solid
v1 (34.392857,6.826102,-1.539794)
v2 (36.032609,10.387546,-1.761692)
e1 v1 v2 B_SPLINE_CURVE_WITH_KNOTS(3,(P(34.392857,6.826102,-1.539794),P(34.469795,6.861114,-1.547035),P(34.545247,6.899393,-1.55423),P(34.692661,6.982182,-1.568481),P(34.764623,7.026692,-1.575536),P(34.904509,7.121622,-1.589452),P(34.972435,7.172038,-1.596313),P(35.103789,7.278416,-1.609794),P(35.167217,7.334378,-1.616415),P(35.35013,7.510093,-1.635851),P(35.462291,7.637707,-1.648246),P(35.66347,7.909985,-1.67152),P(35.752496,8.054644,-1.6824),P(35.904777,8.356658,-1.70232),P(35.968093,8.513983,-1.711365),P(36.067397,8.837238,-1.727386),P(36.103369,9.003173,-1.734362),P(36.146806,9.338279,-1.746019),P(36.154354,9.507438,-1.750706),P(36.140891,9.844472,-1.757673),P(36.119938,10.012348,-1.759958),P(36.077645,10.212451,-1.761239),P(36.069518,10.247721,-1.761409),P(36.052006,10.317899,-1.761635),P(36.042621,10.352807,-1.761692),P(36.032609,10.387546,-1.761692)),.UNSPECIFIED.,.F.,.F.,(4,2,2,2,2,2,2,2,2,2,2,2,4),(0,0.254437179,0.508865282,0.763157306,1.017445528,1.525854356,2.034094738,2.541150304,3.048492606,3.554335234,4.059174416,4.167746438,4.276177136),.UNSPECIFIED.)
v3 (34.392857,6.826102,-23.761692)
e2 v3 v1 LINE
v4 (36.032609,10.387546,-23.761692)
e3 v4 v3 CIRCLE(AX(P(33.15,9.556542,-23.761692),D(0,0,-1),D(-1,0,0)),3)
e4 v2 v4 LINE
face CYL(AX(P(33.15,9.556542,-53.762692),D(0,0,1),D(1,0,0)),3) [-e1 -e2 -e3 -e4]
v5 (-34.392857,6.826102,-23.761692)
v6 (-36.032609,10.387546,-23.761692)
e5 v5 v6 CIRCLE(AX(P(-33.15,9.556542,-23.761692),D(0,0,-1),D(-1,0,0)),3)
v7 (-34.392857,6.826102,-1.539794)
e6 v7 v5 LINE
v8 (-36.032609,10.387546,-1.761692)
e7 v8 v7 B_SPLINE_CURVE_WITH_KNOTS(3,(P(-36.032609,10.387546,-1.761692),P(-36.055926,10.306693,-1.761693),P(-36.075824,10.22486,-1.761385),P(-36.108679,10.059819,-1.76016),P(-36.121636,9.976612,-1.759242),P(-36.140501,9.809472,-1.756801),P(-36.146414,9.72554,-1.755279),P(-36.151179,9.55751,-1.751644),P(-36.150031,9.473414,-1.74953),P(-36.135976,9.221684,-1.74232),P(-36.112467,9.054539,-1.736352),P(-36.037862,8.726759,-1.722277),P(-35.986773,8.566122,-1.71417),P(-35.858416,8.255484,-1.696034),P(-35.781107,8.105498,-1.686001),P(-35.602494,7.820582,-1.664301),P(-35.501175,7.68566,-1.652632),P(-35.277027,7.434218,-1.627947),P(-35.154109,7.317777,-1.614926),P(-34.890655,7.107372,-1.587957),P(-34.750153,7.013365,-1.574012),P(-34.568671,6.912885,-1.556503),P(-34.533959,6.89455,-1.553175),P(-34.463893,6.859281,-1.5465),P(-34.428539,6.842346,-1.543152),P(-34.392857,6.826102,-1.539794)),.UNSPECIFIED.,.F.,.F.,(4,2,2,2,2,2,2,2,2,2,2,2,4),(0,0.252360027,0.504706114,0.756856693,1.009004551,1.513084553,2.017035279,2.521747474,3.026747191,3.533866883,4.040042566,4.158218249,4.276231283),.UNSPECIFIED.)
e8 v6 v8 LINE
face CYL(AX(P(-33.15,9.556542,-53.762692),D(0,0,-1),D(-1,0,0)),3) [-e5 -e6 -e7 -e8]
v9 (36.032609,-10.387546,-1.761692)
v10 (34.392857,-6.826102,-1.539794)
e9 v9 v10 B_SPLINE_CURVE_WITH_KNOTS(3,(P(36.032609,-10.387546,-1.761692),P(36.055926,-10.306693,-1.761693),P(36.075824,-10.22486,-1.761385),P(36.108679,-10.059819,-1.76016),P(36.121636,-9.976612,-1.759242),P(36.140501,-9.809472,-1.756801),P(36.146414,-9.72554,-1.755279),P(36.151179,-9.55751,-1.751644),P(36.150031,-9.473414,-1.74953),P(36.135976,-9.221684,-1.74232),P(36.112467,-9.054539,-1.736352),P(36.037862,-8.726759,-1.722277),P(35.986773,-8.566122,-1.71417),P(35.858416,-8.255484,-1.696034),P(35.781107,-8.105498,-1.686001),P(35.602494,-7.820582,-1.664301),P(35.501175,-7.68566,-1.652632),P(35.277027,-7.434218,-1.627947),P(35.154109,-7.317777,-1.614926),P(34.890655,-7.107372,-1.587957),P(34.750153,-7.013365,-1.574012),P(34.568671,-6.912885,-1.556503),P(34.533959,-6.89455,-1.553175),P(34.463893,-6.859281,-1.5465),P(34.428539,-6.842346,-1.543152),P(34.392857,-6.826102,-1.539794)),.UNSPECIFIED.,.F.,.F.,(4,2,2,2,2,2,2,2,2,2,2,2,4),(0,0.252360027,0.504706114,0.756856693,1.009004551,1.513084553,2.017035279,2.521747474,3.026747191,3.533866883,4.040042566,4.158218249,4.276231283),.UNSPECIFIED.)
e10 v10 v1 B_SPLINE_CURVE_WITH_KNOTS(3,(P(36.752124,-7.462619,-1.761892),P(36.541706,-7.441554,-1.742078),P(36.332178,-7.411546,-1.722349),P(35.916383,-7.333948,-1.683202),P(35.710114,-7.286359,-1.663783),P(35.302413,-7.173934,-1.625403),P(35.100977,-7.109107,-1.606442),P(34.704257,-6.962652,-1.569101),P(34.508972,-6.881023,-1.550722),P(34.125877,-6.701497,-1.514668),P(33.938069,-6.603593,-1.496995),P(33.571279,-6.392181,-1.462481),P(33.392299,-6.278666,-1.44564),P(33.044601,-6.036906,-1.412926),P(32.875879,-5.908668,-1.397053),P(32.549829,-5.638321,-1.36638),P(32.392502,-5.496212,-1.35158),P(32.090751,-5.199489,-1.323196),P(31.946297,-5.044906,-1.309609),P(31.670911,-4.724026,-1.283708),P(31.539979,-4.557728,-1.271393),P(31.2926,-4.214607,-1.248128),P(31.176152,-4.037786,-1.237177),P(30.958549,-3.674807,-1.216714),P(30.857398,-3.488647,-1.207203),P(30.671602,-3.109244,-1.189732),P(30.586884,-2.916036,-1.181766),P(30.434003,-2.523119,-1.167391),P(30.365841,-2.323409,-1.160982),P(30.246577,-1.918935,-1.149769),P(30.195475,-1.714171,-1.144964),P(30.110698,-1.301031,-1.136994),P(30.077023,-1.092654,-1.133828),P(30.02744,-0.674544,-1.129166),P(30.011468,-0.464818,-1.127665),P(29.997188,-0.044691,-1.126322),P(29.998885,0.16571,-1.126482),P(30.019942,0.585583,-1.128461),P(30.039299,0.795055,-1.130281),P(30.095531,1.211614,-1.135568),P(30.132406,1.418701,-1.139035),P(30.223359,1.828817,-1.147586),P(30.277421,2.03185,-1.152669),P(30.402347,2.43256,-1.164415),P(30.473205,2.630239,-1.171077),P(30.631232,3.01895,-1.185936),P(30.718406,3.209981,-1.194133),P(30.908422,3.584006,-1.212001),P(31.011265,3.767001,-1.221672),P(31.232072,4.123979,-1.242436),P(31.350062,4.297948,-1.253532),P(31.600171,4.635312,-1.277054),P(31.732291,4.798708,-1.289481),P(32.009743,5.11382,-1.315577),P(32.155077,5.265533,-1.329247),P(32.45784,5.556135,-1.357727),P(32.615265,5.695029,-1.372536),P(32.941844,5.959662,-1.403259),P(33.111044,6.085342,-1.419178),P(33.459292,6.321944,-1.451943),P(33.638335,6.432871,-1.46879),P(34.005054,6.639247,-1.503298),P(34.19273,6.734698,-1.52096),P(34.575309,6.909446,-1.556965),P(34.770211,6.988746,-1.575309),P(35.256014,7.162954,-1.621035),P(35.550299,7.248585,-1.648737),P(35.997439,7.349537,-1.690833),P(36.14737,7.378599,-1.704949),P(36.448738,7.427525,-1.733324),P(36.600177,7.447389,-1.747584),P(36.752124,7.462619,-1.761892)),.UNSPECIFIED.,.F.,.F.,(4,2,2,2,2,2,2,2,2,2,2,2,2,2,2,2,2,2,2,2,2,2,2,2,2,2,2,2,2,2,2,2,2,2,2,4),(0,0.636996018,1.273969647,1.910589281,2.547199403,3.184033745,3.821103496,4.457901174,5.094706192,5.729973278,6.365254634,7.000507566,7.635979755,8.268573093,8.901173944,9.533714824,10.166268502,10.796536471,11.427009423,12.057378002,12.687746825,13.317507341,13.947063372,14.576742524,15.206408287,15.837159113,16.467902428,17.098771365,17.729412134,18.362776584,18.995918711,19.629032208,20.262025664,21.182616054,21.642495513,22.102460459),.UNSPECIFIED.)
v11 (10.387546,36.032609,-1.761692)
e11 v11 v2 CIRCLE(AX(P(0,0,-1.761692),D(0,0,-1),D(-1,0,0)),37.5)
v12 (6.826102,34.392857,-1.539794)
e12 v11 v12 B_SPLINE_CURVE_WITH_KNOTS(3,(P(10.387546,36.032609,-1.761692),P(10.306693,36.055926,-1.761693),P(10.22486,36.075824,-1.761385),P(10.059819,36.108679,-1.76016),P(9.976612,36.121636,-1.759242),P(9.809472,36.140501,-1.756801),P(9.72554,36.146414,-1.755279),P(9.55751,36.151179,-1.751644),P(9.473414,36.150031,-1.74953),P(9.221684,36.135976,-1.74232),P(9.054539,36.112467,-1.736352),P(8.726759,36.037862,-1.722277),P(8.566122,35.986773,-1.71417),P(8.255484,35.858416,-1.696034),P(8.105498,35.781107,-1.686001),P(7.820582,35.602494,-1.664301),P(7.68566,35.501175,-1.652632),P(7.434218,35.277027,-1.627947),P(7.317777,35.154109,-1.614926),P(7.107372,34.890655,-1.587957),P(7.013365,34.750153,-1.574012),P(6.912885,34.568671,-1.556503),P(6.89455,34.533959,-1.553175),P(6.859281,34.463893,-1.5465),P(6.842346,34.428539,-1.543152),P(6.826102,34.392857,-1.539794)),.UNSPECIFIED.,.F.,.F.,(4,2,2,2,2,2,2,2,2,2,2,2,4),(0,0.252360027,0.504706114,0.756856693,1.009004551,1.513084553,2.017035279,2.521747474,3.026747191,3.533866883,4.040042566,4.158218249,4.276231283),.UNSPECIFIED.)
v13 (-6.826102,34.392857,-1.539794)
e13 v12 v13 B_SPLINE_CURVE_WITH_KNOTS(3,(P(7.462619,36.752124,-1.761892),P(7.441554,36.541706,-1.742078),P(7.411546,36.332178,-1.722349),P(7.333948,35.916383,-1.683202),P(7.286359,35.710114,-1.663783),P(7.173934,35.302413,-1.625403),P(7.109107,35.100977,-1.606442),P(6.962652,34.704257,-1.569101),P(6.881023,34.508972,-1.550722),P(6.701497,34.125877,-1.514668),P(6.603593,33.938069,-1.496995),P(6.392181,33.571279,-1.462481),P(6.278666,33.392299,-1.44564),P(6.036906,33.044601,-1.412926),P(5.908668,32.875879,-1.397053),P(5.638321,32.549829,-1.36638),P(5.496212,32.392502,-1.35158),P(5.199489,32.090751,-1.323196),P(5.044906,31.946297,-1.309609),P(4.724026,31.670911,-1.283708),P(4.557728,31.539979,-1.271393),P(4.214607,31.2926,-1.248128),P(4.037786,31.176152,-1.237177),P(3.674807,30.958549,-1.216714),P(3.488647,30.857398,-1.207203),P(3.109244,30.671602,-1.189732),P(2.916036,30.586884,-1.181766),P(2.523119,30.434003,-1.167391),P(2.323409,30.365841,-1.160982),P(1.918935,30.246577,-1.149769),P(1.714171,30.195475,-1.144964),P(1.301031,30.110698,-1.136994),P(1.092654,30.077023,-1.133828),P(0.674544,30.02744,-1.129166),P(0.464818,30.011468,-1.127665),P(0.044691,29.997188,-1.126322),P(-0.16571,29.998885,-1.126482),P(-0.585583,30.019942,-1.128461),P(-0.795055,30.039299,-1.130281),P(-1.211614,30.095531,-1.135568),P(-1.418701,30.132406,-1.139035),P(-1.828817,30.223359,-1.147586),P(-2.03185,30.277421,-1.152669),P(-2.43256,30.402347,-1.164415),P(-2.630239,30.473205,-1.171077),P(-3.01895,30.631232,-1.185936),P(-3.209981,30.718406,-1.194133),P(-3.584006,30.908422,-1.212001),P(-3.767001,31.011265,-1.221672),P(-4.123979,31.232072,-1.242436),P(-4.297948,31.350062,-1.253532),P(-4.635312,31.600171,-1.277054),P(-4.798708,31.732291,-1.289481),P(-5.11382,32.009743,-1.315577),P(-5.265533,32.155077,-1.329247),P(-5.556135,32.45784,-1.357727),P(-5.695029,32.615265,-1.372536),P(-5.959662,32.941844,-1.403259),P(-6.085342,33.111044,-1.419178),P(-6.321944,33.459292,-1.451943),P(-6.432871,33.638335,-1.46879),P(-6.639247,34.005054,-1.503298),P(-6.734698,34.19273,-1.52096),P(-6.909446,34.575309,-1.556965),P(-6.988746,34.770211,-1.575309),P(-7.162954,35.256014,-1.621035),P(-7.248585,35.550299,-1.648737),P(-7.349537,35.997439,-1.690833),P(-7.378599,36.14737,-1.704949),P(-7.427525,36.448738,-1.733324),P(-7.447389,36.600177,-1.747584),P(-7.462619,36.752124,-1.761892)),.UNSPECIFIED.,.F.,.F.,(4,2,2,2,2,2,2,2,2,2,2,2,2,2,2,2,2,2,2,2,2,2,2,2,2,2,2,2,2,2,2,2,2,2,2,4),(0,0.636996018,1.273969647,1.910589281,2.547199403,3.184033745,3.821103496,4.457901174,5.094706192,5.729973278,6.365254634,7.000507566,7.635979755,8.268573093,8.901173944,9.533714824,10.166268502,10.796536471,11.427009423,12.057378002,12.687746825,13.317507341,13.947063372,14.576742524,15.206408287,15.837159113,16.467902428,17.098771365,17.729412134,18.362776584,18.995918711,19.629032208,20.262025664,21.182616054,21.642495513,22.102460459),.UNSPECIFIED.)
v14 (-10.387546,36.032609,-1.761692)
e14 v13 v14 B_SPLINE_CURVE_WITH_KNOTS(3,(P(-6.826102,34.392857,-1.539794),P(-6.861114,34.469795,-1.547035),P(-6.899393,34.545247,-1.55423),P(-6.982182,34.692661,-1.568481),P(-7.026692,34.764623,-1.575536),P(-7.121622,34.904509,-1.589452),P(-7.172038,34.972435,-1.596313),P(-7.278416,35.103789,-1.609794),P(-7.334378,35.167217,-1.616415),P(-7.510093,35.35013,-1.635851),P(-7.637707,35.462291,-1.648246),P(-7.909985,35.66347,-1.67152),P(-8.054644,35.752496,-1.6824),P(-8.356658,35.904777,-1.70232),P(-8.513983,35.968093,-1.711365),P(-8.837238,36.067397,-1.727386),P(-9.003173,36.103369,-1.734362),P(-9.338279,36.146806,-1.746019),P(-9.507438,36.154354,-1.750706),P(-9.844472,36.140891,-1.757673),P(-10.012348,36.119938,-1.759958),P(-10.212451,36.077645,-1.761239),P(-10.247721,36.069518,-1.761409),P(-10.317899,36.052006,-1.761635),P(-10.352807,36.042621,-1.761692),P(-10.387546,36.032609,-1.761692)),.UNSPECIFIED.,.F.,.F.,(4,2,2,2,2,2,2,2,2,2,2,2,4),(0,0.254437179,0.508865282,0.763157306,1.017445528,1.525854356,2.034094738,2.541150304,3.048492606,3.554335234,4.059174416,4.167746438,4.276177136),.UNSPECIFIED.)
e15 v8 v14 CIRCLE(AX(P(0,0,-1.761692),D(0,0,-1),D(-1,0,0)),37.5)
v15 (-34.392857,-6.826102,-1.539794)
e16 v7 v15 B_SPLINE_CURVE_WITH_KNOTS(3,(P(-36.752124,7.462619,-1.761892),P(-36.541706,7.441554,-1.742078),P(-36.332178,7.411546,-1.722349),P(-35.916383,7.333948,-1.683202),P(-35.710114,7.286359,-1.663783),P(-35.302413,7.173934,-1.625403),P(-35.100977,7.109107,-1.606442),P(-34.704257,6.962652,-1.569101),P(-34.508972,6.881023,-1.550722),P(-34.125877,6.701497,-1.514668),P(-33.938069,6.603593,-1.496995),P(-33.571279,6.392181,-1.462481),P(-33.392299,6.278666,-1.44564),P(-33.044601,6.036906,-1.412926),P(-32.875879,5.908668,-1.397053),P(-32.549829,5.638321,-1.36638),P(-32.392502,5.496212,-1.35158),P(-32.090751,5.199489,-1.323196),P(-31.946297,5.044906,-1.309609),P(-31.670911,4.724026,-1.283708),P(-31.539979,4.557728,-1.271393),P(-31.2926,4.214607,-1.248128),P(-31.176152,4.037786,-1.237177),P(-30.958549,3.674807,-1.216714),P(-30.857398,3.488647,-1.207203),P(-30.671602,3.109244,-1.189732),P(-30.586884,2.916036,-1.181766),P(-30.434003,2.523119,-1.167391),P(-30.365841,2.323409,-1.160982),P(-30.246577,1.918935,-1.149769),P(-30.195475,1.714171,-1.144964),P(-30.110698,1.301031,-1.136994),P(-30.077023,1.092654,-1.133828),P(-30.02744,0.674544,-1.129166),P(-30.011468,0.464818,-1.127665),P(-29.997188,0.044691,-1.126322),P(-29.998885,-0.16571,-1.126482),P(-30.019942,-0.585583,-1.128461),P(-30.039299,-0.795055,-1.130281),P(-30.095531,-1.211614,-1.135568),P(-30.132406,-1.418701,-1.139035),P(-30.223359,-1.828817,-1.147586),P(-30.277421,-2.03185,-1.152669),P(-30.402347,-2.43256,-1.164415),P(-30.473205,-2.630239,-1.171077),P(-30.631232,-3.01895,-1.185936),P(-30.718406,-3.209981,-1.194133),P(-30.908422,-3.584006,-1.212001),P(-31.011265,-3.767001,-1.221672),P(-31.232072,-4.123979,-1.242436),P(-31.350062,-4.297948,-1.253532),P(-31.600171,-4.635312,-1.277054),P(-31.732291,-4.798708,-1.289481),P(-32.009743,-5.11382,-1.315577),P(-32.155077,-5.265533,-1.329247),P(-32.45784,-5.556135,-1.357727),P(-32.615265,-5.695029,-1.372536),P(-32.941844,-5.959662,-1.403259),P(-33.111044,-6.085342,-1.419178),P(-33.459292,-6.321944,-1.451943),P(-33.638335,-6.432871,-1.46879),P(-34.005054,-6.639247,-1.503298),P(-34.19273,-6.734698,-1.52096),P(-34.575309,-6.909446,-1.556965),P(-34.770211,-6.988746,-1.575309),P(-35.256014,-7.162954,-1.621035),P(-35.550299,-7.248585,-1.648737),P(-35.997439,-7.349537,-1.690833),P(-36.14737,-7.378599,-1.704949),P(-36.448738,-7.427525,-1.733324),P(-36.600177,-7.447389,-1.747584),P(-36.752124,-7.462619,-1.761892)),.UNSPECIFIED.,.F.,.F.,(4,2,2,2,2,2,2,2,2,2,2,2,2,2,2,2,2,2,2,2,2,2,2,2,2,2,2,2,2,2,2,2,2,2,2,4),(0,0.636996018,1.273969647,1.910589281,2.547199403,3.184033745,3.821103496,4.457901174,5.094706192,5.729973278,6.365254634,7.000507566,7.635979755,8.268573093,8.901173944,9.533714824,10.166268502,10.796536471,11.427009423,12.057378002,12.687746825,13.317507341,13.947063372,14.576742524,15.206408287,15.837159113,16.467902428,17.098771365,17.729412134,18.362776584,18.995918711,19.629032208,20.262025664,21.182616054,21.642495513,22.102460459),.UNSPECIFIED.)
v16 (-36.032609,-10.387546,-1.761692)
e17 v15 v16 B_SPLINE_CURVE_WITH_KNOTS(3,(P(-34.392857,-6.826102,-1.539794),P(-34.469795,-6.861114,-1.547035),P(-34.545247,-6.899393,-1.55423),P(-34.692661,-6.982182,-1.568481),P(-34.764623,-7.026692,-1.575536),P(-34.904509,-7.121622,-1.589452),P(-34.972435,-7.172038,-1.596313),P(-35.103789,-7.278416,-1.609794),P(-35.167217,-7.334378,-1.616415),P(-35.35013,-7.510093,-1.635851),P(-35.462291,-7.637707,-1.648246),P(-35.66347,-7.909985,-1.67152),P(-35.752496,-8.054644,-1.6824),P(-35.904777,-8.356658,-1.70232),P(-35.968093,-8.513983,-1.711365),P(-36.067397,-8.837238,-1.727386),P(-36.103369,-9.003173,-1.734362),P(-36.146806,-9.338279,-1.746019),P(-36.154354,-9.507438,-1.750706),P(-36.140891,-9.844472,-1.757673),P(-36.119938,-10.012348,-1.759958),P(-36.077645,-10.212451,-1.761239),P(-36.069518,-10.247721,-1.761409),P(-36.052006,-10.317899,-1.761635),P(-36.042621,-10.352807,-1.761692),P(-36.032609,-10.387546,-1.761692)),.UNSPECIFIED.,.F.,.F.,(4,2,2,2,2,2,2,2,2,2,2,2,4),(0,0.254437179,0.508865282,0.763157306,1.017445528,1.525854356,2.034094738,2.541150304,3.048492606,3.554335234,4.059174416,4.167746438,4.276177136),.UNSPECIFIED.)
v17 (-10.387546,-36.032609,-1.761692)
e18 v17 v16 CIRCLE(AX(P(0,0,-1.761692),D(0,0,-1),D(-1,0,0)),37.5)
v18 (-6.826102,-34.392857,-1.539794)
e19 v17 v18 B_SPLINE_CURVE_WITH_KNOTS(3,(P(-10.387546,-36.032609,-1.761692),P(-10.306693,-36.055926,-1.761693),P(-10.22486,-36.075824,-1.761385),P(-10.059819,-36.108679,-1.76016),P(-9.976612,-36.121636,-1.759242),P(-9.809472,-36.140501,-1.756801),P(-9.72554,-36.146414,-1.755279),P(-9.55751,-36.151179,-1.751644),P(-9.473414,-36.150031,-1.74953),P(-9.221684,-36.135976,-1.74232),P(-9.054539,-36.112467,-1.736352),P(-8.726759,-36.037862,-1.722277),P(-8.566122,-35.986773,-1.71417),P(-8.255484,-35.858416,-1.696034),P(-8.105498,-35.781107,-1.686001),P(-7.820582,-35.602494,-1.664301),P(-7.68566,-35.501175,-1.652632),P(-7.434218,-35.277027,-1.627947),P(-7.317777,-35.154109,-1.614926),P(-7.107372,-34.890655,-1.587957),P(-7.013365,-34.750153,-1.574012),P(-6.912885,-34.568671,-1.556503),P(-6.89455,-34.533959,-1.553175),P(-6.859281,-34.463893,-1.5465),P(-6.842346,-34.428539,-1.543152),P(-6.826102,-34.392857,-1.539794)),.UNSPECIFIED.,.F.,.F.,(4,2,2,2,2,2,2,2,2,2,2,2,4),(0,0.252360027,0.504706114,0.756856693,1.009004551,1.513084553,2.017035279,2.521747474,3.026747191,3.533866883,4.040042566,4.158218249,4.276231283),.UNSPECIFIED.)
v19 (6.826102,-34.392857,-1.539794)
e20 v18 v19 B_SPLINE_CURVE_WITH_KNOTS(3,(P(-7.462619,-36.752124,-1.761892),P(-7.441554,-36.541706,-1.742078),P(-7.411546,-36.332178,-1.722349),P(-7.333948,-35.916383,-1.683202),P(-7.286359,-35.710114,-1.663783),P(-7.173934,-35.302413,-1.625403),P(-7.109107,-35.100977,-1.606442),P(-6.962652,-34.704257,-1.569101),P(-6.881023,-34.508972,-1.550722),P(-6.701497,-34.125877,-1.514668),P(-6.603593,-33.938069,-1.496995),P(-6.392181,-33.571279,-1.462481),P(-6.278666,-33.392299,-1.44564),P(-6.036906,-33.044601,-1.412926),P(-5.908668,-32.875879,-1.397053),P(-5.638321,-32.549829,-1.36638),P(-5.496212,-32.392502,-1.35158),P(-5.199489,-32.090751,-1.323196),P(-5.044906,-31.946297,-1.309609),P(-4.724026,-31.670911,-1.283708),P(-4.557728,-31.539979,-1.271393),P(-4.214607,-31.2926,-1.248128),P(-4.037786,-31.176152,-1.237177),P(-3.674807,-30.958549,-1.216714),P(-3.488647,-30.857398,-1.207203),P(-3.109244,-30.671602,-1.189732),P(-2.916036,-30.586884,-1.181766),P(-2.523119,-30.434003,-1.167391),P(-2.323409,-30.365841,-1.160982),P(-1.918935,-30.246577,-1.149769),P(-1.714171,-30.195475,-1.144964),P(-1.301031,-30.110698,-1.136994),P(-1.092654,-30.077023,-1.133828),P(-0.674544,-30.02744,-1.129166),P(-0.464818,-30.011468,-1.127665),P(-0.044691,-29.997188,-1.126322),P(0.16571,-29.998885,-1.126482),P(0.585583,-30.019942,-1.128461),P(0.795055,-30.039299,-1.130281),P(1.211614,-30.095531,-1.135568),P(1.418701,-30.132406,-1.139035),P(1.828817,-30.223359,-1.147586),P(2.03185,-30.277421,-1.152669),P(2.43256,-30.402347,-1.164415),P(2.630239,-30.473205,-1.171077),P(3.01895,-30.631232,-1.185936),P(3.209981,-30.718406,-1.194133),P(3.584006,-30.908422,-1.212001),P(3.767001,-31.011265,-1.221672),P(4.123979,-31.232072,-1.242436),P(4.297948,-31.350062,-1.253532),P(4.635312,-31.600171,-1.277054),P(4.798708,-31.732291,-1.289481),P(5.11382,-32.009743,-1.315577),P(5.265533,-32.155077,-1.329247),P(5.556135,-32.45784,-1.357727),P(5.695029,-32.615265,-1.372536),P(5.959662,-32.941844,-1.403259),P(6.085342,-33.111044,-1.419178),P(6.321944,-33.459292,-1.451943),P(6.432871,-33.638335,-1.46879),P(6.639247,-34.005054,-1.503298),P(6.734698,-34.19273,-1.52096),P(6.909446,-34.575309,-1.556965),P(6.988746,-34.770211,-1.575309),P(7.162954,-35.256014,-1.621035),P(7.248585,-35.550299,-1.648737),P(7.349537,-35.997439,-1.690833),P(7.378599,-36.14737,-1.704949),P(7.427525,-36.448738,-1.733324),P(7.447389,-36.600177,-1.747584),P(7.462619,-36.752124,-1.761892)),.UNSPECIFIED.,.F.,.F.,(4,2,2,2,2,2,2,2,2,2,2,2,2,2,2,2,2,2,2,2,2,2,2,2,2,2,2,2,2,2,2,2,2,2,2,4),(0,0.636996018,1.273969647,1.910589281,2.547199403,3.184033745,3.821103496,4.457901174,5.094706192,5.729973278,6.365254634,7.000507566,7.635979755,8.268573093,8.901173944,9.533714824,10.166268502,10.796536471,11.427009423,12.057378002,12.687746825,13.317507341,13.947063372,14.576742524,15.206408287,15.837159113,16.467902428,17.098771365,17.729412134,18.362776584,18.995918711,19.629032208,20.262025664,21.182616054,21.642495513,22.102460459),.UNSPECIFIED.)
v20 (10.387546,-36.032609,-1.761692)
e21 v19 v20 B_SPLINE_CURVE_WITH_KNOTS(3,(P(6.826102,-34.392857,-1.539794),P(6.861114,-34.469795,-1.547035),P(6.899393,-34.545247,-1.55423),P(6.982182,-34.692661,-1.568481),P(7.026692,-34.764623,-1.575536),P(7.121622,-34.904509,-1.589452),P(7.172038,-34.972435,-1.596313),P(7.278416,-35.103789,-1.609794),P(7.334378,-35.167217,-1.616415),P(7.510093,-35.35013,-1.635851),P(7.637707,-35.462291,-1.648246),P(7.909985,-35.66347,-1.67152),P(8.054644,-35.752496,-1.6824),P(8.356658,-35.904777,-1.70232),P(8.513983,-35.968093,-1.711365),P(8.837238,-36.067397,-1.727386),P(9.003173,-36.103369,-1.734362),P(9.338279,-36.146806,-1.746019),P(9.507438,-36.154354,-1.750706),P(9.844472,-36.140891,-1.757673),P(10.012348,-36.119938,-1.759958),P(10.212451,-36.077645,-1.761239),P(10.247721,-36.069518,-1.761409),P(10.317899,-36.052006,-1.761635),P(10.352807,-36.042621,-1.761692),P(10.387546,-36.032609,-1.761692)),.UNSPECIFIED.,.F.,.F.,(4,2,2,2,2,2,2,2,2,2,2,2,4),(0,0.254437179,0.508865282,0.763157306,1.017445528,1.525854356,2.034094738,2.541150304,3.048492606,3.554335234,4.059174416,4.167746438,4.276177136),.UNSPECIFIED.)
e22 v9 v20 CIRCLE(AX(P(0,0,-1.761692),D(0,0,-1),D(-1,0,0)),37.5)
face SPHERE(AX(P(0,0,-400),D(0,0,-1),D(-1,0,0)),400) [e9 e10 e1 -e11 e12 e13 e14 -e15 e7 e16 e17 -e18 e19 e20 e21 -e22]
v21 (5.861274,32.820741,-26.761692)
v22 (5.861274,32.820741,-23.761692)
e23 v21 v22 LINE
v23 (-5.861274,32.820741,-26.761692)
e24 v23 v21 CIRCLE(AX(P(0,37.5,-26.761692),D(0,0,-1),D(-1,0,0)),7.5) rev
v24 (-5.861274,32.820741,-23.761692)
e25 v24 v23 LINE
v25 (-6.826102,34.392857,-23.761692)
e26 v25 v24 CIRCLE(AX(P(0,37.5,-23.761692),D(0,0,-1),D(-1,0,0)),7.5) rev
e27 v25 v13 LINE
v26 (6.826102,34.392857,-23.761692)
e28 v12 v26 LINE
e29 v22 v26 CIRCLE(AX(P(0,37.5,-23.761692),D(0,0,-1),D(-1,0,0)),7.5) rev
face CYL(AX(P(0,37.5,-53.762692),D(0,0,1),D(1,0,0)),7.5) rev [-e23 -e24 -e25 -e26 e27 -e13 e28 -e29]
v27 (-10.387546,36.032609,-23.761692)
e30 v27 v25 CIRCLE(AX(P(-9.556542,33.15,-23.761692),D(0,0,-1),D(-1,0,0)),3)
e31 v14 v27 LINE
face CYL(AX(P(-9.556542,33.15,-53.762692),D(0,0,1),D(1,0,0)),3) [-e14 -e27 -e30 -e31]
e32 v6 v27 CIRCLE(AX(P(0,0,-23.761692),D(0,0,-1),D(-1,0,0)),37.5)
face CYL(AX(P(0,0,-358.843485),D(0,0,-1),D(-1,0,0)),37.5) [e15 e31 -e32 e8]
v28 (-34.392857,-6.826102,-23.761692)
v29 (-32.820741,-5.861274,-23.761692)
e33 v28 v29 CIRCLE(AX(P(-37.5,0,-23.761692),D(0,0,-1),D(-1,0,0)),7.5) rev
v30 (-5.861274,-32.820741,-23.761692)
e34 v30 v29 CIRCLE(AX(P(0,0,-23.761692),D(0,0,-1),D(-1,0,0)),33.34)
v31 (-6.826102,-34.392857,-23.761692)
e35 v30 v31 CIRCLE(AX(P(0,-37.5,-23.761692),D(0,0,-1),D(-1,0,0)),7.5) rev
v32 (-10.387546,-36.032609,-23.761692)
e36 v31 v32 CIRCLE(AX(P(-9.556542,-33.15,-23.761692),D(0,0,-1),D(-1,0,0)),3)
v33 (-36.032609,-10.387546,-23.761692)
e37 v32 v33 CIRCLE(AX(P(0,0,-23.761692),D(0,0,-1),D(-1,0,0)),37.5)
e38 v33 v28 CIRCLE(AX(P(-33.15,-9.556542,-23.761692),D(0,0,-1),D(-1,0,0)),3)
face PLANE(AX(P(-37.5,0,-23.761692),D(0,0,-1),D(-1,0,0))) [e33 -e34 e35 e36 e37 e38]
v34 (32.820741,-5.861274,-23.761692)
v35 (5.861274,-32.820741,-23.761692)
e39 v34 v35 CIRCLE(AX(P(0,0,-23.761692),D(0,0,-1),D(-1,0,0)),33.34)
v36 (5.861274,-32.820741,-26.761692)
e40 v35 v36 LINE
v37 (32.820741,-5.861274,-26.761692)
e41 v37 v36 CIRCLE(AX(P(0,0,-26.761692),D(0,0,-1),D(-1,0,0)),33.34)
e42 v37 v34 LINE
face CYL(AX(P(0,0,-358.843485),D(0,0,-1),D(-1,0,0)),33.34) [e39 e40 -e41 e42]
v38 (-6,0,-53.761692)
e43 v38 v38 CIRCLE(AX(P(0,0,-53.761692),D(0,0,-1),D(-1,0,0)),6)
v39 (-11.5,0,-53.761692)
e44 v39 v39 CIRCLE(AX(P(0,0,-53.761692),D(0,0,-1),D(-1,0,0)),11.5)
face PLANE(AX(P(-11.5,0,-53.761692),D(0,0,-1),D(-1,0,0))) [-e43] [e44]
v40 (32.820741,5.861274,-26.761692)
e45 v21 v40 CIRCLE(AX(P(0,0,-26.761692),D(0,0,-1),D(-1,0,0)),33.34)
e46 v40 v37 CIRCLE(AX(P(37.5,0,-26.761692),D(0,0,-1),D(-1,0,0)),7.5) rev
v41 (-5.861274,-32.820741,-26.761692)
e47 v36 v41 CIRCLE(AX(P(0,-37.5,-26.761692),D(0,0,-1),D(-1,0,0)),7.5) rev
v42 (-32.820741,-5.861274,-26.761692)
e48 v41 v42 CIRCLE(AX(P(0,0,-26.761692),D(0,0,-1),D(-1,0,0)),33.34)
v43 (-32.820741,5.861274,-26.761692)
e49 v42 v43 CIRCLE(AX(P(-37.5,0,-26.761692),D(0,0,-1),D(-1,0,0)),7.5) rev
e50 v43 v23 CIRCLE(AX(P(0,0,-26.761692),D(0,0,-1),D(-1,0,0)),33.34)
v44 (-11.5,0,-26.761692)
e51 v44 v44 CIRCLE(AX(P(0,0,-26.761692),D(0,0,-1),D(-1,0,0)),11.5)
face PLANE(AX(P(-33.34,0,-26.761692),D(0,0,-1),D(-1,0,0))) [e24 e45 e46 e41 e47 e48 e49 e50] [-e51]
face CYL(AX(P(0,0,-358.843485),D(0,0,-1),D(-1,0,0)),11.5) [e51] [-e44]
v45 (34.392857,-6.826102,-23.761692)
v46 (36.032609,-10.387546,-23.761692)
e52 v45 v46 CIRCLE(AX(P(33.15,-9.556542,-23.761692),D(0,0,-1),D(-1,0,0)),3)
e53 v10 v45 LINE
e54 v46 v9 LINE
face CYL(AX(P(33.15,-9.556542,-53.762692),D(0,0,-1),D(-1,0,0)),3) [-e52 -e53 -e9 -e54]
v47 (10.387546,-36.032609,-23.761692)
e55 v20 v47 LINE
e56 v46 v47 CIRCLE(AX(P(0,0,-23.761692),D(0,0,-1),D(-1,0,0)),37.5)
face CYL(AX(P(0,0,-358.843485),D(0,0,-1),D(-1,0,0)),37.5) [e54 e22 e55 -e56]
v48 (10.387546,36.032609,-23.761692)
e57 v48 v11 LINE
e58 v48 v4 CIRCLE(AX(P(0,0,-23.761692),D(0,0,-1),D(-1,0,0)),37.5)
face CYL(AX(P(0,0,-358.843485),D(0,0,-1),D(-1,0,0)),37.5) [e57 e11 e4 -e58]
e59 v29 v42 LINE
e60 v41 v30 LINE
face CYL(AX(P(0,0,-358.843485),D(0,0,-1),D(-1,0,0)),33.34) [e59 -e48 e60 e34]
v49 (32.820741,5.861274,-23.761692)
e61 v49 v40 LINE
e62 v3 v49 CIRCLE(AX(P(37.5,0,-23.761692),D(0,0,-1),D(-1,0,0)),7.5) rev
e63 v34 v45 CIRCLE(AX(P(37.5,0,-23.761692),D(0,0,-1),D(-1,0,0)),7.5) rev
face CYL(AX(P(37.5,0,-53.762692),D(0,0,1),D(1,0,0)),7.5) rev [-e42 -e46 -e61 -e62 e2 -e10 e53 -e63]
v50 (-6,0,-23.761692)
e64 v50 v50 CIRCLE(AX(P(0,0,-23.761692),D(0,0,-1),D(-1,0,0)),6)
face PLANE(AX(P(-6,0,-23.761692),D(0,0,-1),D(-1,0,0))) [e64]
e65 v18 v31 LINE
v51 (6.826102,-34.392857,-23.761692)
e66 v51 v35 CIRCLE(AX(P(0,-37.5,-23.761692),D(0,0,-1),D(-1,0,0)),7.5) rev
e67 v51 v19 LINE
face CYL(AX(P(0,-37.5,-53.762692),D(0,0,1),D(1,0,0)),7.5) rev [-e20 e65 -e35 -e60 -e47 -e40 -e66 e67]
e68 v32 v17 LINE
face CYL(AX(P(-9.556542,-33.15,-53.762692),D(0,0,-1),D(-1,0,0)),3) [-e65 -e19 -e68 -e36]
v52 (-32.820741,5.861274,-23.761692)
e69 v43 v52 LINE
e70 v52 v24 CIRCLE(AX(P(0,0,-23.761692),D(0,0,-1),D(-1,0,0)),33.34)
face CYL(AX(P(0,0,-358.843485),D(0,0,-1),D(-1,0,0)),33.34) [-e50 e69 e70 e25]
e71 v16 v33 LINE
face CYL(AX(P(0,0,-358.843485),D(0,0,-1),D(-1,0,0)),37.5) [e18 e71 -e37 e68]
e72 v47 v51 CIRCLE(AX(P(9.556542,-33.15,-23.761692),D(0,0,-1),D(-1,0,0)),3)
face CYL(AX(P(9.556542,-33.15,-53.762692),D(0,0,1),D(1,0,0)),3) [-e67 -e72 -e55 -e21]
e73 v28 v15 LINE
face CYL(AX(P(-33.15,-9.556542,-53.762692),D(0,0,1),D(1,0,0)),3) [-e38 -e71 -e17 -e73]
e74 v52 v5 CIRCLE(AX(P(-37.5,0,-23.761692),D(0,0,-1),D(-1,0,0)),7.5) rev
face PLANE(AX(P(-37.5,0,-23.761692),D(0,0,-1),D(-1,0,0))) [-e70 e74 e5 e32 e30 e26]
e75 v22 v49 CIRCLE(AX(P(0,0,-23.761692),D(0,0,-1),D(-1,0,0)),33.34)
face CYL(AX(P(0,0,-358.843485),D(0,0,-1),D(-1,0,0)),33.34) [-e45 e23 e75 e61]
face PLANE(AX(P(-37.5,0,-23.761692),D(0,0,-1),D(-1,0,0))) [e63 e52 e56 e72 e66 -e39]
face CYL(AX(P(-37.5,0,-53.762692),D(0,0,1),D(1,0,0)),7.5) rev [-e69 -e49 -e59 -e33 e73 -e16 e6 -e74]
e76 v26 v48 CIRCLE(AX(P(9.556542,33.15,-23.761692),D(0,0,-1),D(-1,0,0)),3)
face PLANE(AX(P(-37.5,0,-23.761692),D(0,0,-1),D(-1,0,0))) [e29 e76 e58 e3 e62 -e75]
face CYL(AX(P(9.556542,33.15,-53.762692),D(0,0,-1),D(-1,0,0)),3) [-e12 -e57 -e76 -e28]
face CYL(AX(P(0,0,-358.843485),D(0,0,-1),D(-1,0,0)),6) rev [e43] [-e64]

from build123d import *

# Parameters (mm, degrees)
CUT_EXTRUDE1_REACH = 77.517
SKETCH2_R          = 7.5
FILLET1_R          = 3


with BuildPart() as part:
    # Sketch1 → Revolve1 (revolve)
    with BuildSketch(Plane(origin=(0, 0, 0), x_dir=(1, 0, 0), z_dir=(0, 1, 0))):
        with BuildLine():
            Line((0, 23.761691948), (0, 0))
            ThreePointArc((0, 0), (-18.770678987, 0.44066572), (-37.5, 1.761691948))
            Line((-37.5, 1.761691948), (-37.5, 23.761691948))
            Line((-37.5, 23.761691948), (-33.34, 23.761691948))
            Line((-33.34, 23.761691948), (-33.34, 26.761691948))
            Line((-33.34, 26.761691948), (-11.5, 26.761691948))
            Line((-11.5, 26.761691948), (-11.5, 53.761691948))
            Line((-11.5, 53.761691948), (-6, 53.761691948))
            Line((-6, 53.761691948), (-6, 23.761691948))
            Line((-6, 23.761691948), (0, 23.761691948))
        make_face()
    revolve(axis=Axis((0, 0, -358.843484937), (0, 0, 1)))

    # Sketch2 → Cut-Extrude1 (cut, up to next)
    with BuildSketch(Plane.XY, mode=Mode.PRIVATE) as cut_extrude1_sk1:
        with Locations((0, 37.5)):
            Circle(SKETCH2_R)
    cut_extrude1_tool1 = extrude(cut_extrude1_sk1.sketch, amount=-CUT_EXTRUDE1_REACH, mode=Mode.PRIVATE) & part.part
    # Sketch2 → Cut-Extrude1 (cut, up to next)
    with BuildSketch(Plane.XY, mode=Mode.PRIVATE) as cut_extrude1_sk2:
        with Locations((37.5, 0)):
            Circle(SKETCH2_R)
    cut_extrude1_tool2 = extrude(cut_extrude1_sk2.sketch, amount=-CUT_EXTRUDE1_REACH, mode=Mode.PRIVATE) & part.part
    # Sketch2 → Cut-Extrude1 (cut, up to next)
    with BuildSketch(Plane.XY, mode=Mode.PRIVATE) as cut_extrude1_sk3:
        with Locations((0, -37.5)):
            Circle(SKETCH2_R)
    cut_extrude1_tool3 = extrude(cut_extrude1_sk3.sketch, amount=-CUT_EXTRUDE1_REACH, mode=Mode.PRIVATE) & part.part
    # Sketch2 → Cut-Extrude1 (cut, up to next)
    with BuildSketch(Plane.XY, mode=Mode.PRIVATE) as cut_extrude1_sk4:
        with Locations((-37.5, 0)):
            Circle(SKETCH2_R)
    cut_extrude1_tool4 = extrude(cut_extrude1_sk4.sketch, amount=-CUT_EXTRUDE1_REACH, mode=Mode.PRIVATE) & part.part
    add(cut_extrude1_tool1.solids().sort_by_distance((0, 37.5, 0))[0], mode=Mode.SUBTRACT)
    add(cut_extrude1_tool2.solids().sort_by_distance((37.5, 0, 0))[0], mode=Mode.SUBTRACT)
    add(cut_extrude1_tool3.solids().sort_by_distance((0, -37.5, 0))[0], mode=Mode.SUBTRACT)
    add(cut_extrude1_tool4.solids().sort_by_distance((-37.5, 0, 0))[0], mode=Mode.SUBTRACT)

    # Fillet1
    # the kernel refuses this fillet: 3 mm, written as the material it takes off along each edge
    with BuildSketch(Plane(origin=(-36.75, -7.462405778, -31.291256689), x_dir=(0.9654419045574989, 0.26061835876313283, 0), z_dir=(0, 0, 1))) as fillet1_piece_1:
        with BuildLine():
            CenterArc((2.929820443, -2.959993207), FILLET1_R, 99.367586043, 81.606967112)
            ThreePointArc((-0.0697456, -3.01101823), (-0.065113873, -1.504808627), (0, 0))
            ThreePointArc((0, 0), (1.220758518, -0.100016984), (2.441517036, 0))
        make_face()
    extrude(amount=37.059130081, mode=Mode.SUBTRACT)
    with BuildSketch(Plane(origin=(-36.75, 7.462405778, -31.291256689), x_dir=(0.9654419045574933, -0.26061835876315326, 0), z_dir=(0, 0, 1))) as fillet1_piece_2:
        with BuildLine():
            CenterArc((2.929820443, 2.959993207), FILLET1_R, 179.025446846, 81.606967112)
            ThreePointArc((-0.0697456, 3.01101823), (-0.065113873, 1.504808627), (0, 0))
            ThreePointArc((0, 0), (1.220758518, 0.100016984), (2.441517036, 0))
        make_face()
    extrude(amount=37.059129481, mode=Mode.SUBTRACT)
    with BuildSketch(Plane(origin=(7.462405778, -36.75, -31.291256689), x_dir=(-0.26061835876313594, 0.9654419045574982, 0), z_dir=(0, 0, 1)), Plane(origin=(36.75, 7.462405778, -31.291256689), x_dir=(-0.9654419045574977, -0.2606183587631379, 0), z_dir=(0, 0, 1)), Plane(origin=(-7.462405778, 36.75, -31.291256689), x_dir=(0.2606183587631421, -0.9654419045574966, 0), z_dir=(0, 0, 1))) as fillet1_piece_3:
        with BuildLine():
            CenterArc((2.929820443, -2.959993207), FILLET1_R, 99.367586043, 81.606967112)
            ThreePointArc((-0.0697456, -3.01101823), (-0.065113873, -1.504808627), (0, 0))
            ThreePointArc((0, 0), (1.220758518, -0.100016984), (2.441517036, 0))
        make_face()
    extrude(amount=37.059129481, mode=Mode.SUBTRACT)
    with BuildSketch(Plane(origin=(-7.462405778, -36.75, -31.291256689), x_dir=(-0.9712182108388207, 0.238191492155031, 0), z_dir=(0, 0, 1)), Plane(origin=(36.75, -7.462405778, -31.291256689), x_dir=(-0.23819149215502627, -0.9712182108388219, 0), z_dir=(0, 0, 1)), Plane(origin=(7.462405778, 36.75, -31.291256689), x_dir=(0.9712182108388221, -0.2381914921550248, 0), z_dir=(0, 0, 1))) as fillet1_piece_4:
        with BuildLine():
            CenterArc((2.89135286, -2.997580065), FILLET1_R, 87.69851564, 81.606967112)
            ThreePointArc((-0.056538816, -2.440862306), (0.071720755, -1.222747271), (0, 0))
            ThreePointArc((0, 0), (1.505912948, 0.030249184), (3.011825896, 0))
        make_face()
    extrude(amount=37.059129481, mode=Mode.SUBTRACT)


solid = part.part
